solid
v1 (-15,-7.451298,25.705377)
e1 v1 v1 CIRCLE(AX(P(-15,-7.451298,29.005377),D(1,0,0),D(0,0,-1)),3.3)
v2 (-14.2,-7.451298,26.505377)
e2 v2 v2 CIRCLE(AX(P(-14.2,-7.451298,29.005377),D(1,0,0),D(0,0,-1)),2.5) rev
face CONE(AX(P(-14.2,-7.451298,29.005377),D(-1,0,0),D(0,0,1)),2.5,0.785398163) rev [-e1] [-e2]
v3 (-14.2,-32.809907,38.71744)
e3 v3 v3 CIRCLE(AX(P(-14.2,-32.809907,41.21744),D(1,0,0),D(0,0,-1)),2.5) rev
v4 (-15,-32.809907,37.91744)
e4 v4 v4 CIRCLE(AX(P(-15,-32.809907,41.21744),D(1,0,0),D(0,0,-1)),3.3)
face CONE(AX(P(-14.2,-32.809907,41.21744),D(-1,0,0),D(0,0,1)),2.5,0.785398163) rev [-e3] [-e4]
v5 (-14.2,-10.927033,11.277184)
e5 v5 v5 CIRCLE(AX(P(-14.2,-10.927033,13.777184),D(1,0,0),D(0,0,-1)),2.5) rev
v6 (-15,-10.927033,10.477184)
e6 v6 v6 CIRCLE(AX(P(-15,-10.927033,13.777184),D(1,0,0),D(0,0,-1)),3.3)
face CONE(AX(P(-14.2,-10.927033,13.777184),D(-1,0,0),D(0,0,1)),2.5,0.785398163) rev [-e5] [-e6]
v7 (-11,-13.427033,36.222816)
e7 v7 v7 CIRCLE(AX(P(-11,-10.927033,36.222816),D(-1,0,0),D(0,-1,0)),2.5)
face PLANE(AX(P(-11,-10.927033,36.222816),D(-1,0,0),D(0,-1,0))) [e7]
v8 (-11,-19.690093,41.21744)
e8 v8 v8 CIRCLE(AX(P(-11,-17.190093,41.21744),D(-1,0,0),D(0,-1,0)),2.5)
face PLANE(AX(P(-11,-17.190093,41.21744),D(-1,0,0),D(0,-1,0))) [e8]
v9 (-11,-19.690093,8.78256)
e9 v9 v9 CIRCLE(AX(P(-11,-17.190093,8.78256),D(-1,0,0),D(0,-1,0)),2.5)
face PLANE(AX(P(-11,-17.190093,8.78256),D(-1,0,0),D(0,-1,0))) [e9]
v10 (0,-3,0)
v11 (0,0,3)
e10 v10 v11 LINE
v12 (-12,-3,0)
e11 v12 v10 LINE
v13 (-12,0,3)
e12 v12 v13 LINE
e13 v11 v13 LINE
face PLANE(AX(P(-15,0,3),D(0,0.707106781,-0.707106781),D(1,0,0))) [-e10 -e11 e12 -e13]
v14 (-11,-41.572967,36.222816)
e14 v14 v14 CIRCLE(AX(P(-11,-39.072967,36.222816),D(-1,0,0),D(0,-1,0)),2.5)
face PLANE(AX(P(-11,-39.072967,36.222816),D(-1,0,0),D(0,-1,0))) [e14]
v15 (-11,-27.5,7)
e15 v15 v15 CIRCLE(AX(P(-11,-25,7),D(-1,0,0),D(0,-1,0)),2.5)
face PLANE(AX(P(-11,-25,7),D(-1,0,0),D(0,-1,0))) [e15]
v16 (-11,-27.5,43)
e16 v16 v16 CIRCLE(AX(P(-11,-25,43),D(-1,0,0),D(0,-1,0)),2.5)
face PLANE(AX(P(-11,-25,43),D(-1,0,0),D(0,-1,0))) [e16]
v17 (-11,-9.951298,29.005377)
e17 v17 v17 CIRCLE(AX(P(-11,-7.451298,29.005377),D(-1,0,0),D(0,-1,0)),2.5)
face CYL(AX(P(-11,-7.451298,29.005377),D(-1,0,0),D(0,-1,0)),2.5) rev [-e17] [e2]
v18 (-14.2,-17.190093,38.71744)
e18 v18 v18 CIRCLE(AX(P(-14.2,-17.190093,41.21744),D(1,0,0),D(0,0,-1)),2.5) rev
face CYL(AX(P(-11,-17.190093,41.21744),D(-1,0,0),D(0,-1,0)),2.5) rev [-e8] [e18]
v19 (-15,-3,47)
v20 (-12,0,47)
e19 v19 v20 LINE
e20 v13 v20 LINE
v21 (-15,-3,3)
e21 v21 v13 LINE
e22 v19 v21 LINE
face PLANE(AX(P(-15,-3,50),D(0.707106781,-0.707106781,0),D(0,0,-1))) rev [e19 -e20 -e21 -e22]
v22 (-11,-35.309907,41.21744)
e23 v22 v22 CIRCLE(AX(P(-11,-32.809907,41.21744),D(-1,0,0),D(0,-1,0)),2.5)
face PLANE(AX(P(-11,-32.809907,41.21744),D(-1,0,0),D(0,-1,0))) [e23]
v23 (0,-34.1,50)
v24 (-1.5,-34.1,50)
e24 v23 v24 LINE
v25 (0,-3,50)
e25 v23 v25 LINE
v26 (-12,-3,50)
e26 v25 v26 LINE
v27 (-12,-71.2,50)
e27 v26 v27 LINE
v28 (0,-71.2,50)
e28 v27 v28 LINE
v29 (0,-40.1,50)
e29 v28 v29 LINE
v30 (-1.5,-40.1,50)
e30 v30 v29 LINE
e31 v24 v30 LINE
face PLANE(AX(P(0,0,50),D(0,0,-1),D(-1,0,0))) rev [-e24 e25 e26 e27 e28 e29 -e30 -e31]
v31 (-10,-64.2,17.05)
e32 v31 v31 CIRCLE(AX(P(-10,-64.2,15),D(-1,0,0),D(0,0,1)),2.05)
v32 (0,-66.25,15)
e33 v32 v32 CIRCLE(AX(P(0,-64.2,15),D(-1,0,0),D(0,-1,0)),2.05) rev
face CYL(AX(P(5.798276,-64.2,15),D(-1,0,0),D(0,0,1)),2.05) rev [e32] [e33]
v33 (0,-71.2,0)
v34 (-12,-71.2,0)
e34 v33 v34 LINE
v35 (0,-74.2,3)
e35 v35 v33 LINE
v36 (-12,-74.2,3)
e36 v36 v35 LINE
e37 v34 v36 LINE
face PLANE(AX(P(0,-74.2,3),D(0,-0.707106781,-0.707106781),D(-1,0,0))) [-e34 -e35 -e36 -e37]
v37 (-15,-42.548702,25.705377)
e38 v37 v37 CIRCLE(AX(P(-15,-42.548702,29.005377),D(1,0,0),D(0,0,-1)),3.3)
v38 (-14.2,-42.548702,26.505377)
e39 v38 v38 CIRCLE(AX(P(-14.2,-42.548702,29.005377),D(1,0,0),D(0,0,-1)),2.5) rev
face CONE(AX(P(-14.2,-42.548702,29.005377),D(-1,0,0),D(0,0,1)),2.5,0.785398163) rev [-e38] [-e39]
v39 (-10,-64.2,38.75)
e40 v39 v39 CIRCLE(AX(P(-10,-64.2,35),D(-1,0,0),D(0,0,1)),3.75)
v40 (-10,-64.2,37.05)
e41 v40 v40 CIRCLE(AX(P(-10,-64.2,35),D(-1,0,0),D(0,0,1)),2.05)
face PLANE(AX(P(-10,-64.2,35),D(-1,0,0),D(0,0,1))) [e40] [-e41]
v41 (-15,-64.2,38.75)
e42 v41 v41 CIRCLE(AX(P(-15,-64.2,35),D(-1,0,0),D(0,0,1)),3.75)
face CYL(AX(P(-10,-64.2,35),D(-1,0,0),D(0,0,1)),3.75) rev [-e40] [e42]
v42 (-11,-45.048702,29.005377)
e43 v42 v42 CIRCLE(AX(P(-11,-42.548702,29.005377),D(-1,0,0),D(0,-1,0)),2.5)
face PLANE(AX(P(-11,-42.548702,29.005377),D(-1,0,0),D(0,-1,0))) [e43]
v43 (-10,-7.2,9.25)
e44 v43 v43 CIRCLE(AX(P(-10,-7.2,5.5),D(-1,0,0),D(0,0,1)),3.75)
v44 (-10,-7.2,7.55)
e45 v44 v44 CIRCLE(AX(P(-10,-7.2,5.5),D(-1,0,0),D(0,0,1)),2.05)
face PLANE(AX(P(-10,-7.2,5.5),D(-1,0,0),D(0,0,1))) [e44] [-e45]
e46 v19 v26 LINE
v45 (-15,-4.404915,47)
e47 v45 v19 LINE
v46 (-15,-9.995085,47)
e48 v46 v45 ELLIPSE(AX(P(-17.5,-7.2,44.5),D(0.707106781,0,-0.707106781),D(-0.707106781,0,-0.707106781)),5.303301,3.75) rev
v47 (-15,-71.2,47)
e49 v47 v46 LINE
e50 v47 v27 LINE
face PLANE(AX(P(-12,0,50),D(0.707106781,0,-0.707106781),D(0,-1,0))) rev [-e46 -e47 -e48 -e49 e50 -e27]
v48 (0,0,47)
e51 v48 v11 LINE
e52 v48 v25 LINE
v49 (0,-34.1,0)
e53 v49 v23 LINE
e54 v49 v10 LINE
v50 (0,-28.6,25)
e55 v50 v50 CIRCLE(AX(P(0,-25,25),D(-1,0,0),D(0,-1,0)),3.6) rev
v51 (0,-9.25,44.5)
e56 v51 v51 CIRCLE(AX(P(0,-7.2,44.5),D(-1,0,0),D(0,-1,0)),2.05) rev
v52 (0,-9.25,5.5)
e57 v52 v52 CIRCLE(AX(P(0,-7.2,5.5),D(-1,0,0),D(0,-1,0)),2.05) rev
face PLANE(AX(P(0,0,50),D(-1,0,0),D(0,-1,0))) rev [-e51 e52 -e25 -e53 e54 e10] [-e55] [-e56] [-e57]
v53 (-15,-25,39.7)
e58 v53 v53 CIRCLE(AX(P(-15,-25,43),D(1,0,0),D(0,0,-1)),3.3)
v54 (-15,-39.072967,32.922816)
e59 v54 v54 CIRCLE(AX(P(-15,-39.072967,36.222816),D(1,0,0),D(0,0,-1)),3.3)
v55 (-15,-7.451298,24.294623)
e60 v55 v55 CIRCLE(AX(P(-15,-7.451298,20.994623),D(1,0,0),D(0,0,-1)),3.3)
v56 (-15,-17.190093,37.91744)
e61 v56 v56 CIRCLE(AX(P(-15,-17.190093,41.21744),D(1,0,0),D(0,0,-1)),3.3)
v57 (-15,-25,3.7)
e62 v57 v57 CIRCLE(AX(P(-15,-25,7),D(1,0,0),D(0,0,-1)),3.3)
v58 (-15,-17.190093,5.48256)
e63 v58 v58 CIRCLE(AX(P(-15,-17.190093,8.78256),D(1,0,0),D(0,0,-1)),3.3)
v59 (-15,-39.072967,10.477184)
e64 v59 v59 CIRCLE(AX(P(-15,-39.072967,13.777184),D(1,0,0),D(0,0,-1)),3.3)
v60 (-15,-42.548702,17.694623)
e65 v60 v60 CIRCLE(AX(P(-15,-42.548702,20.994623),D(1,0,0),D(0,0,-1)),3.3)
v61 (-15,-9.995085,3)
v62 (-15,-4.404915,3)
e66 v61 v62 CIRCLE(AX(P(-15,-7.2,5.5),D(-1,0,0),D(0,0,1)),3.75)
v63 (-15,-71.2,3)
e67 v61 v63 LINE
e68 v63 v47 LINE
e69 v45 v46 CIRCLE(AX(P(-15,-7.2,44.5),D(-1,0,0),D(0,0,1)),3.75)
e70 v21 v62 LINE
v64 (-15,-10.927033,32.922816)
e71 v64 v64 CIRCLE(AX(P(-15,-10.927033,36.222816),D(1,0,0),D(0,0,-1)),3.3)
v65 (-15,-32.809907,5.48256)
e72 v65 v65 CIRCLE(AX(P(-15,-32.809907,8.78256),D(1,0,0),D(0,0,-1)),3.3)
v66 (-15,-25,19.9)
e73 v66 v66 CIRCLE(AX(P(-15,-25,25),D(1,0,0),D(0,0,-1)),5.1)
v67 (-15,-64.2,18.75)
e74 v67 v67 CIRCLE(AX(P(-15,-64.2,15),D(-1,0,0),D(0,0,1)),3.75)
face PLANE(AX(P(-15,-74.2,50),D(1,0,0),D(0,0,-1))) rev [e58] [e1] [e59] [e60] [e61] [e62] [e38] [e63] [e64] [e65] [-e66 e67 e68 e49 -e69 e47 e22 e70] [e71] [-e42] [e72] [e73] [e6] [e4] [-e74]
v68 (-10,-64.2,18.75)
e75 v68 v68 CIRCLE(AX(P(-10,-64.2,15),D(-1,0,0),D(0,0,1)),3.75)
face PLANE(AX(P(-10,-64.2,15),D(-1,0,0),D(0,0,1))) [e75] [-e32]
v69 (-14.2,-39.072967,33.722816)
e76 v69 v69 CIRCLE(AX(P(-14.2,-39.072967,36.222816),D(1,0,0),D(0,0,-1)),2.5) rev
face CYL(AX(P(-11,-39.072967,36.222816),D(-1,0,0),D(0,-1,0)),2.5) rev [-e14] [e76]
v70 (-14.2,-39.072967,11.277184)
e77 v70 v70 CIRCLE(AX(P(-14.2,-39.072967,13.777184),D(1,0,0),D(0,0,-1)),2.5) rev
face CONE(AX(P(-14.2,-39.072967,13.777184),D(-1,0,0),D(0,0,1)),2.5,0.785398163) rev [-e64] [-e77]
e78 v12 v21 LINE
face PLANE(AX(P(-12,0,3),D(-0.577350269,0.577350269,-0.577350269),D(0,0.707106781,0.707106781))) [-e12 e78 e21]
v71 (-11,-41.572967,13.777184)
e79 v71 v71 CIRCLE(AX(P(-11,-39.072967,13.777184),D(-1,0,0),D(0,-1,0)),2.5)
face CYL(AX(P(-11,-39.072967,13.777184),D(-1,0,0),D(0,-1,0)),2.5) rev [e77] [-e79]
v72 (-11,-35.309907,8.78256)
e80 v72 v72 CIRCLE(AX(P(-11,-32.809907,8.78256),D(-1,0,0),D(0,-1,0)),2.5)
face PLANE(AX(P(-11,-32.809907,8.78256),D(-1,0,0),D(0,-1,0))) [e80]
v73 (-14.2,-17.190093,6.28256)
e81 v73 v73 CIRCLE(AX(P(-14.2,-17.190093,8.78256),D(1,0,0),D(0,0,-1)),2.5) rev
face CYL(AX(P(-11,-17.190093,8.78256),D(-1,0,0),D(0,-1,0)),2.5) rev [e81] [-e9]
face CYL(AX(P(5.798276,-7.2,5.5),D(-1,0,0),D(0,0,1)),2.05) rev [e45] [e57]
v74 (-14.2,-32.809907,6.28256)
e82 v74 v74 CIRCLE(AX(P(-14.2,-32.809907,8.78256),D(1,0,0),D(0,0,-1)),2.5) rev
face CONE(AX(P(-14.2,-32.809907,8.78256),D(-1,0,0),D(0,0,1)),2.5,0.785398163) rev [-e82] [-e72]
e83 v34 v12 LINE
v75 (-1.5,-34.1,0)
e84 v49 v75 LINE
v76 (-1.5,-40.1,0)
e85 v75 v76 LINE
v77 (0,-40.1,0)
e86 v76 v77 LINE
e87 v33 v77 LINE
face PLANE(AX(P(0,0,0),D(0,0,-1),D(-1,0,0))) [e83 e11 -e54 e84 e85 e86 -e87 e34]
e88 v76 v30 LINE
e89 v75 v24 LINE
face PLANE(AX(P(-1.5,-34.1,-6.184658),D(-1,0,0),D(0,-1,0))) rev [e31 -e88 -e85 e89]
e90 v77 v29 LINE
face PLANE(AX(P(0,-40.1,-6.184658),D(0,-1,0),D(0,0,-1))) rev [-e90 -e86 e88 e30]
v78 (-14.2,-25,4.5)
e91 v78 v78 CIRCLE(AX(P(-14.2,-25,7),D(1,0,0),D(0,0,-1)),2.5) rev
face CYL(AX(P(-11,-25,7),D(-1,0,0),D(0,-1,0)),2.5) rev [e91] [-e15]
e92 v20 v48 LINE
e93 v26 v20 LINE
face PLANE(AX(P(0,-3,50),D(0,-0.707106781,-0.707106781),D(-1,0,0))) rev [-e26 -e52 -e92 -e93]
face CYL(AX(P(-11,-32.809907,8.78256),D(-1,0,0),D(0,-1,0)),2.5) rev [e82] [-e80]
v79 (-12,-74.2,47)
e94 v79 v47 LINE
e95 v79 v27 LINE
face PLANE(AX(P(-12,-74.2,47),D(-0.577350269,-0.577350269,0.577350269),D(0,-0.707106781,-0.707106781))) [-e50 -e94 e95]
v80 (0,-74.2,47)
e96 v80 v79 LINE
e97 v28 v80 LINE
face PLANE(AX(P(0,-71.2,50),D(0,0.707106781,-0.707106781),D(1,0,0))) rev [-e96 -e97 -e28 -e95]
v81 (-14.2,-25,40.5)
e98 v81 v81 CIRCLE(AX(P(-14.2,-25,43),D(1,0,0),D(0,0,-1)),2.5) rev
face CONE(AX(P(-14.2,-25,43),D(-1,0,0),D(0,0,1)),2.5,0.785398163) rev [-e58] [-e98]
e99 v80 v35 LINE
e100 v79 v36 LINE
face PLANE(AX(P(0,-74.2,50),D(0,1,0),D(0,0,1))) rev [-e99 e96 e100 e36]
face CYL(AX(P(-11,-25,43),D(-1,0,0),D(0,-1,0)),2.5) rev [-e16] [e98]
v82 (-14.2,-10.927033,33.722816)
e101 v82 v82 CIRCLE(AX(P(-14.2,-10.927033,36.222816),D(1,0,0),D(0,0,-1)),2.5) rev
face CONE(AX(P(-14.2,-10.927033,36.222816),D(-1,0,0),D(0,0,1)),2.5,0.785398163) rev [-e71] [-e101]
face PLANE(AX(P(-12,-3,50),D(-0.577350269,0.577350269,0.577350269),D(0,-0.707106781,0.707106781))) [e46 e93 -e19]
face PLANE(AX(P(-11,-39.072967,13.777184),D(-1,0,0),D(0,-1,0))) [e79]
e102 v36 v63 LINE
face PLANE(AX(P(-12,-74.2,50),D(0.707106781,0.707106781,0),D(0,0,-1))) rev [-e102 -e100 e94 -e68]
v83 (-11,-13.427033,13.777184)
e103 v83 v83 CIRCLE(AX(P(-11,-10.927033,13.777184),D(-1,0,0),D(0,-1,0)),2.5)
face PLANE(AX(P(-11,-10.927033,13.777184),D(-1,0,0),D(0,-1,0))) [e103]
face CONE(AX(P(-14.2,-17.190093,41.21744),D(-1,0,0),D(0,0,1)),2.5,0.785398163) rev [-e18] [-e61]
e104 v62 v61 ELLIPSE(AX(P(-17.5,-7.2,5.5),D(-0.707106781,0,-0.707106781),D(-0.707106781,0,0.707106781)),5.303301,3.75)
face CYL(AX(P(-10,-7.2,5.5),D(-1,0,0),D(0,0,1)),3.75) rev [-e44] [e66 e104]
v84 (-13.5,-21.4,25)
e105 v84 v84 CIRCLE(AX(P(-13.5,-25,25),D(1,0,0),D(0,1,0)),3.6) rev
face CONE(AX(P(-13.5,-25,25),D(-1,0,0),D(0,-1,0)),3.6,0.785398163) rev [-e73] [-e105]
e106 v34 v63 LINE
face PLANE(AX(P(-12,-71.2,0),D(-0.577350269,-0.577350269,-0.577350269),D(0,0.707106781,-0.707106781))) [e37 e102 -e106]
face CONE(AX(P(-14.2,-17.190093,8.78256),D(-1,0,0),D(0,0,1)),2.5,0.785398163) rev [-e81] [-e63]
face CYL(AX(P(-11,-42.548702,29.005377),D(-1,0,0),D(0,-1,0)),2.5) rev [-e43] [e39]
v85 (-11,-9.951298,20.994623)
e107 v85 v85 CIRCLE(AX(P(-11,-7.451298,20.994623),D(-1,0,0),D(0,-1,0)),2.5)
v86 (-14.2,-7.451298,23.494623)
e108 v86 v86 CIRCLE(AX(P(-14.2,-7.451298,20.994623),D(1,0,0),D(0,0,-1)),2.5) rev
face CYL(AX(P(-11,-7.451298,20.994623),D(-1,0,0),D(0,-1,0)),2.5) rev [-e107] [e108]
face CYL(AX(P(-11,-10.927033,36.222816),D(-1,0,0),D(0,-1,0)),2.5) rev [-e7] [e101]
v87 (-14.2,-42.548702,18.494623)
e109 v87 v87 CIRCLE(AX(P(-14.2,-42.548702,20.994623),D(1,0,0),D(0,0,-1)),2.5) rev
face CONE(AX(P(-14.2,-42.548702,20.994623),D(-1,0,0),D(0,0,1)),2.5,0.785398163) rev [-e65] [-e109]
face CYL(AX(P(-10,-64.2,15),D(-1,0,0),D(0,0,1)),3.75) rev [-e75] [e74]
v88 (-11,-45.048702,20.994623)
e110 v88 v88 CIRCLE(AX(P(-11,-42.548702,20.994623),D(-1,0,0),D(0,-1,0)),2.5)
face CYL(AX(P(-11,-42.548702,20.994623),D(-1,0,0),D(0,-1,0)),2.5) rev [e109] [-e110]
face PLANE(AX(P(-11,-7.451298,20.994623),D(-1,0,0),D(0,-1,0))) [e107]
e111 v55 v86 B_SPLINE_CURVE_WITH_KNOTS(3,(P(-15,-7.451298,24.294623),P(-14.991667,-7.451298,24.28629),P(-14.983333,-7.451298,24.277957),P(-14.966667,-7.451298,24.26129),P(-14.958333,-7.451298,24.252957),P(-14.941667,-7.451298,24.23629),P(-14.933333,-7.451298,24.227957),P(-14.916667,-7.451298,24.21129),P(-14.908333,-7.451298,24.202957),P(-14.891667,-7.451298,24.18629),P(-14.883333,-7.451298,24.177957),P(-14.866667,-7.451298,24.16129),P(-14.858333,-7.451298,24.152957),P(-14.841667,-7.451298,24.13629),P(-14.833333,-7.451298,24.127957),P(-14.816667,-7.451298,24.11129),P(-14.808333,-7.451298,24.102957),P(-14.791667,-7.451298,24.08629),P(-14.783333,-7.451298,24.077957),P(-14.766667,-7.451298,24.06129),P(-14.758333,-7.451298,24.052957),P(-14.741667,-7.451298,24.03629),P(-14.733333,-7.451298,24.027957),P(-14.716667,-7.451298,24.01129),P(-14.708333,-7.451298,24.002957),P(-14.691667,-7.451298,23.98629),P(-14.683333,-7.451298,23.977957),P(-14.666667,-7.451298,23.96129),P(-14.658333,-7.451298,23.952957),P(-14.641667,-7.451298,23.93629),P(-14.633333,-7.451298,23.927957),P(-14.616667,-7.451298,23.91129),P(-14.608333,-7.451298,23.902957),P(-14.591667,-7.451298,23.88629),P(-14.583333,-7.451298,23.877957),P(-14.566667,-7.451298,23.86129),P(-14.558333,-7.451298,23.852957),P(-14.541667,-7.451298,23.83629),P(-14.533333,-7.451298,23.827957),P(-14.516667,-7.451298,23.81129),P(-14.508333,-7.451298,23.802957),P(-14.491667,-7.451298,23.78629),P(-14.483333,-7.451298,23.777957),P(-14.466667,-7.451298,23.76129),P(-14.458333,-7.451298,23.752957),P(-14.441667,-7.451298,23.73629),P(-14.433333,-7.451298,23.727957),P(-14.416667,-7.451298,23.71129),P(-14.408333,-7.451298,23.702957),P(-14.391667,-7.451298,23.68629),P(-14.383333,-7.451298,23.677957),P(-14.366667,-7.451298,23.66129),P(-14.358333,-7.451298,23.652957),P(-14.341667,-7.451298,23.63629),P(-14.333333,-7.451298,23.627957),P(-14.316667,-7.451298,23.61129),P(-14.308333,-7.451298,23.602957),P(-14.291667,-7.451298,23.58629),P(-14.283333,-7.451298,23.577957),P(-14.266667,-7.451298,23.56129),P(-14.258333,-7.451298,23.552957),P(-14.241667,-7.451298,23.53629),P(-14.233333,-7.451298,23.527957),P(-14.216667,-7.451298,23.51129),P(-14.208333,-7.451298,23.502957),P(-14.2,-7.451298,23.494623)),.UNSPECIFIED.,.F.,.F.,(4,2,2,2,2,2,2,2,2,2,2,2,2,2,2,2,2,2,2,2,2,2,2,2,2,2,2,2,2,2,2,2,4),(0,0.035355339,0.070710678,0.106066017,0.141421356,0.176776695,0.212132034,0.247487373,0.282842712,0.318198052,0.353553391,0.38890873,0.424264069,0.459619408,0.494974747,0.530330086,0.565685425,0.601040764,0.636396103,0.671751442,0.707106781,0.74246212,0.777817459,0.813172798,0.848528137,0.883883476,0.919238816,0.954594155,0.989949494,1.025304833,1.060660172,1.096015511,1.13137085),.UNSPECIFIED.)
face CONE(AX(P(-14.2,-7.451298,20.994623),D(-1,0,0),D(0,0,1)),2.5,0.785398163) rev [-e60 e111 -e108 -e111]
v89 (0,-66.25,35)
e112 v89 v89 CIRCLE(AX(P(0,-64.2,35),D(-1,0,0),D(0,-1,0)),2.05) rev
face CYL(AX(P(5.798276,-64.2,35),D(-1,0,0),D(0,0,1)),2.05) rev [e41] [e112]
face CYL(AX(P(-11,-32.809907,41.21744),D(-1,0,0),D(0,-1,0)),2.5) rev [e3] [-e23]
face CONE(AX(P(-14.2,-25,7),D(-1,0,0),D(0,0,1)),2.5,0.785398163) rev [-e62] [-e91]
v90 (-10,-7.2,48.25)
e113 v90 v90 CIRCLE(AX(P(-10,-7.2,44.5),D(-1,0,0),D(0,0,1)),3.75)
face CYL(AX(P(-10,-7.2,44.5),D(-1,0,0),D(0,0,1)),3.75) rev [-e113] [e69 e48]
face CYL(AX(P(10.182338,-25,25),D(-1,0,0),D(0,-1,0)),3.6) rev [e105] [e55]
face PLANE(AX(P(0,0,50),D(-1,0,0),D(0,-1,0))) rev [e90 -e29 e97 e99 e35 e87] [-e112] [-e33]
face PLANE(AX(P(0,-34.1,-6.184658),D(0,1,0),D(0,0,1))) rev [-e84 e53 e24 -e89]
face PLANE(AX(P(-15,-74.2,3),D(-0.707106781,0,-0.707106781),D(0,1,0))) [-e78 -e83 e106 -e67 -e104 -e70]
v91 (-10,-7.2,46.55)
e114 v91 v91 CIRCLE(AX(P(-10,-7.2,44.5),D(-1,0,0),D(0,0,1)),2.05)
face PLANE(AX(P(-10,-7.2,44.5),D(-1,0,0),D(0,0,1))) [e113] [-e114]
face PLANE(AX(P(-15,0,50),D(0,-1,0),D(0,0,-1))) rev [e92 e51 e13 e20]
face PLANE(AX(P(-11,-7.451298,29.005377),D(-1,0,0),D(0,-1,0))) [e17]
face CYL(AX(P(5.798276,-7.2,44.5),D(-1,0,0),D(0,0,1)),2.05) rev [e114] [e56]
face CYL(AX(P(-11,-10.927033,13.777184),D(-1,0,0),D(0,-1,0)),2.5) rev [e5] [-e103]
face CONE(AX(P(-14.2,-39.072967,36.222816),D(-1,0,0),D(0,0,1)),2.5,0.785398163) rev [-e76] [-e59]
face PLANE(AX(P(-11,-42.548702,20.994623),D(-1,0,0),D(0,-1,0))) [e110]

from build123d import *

# Parameters (mm, degrees)
SKETCH1_W           = 15
SKETCH1_H           = 74.2
BOSS_EXTRUDE1_DEPTH = 50
SKETCH4_R           = 2.5
CUT_EXTRUDE4_DEPTH  = 4
CHAMFER2_SIZE       = 0.8
SKETCH5_R           = 3.6
CUT_EXTRUDE5_DEPTH  = 15
CHAMFER3_SIZE       = 1.5
SKETCH6_W           = 1.5
SKETCH6_H           = 6
CUT_EXTRUDE6_DEPTH  = 50
SKETCH7_R           = 3.75
CUT_EXTRUDE7_DEPTH  = 5
SKETCH8_R           = 2.05
CUT_EXTRUDE8_DEPTH  = 10


with BuildPart() as part:
    # Sketch1 → Boss-Extrude1 (new body)
    with BuildSketch(Plane.XY):
        with Locations((-7.5, -37.1)):
            Rectangle(SKETCH1_W, SKETCH1_H)
    extrude(amount=BOSS_EXTRUDE1_DEPTH)

    # Sketch4 → Cut-Extrude4 (cut)
    with BuildSketch(Plane.ZY.offset(15)):
        with Locations(Location((43, -25, 0), (0, 0, 270))):
            Circle(SKETCH4_R)
        with Locations(Location((41.217439622, -32.809907304, 0), (0, 0, 270))):
            Circle(SKETCH4_R)
        with Locations(Location((36.222816433, -39.072966684, 0), (0, 0, 270))):
            Circle(SKETCH4_R)
        with Locations(Location((29.005376811, -42.548702419, 0), (0, 0, 270))):
            Circle(SKETCH4_R)
        with Locations(Location((20.994623189, -42.548702419, 0), (0, 0, 270))):
            Circle(SKETCH4_R)
        with Locations(Location((13.777183567, -39.072966684, 0), (0, 0, 270))):
            Circle(SKETCH4_R)
        with Locations(Location((8.782560378, -32.809907304, 0), (0, 0, 270))):
            Circle(SKETCH4_R)
        with Locations(Location((7, -25, 0), (0, 0, 270))):
            Circle(SKETCH4_R)
        with Locations(Location((8.782560378, -17.190092696, 0), (0, 0, 270))):
            Circle(SKETCH4_R)
        with Locations(Location((13.777183567, -10.927033316, 0), (0, 0, 270))):
            Circle(SKETCH4_R)
        with Locations(Location((20.994623189, -7.451297581, 0), (0, 0, 270))):
            Circle(SKETCH4_R)
        with Locations(Location((29.005376811, -7.451297581, 0), (0, 0, 270))):
            Circle(SKETCH4_R)
        with Locations(Location((36.222816433, -10.927033316, 0), (0, 0, 270))):
            Circle(SKETCH4_R)
        with Locations(Location((41.217439622, -17.190092696, 0), (0, 0, 270))):
            Circle(SKETCH4_R)
    extrude(amount=-CUT_EXTRUDE4_DEPTH, mode=Mode.SUBTRACT)

    # Chamfer2
    chamfer2_edges = [part.edges().sort_by_distance(p)[0] for p in [
        (-15, -30.309907304, 41.217439622),
        (-15, -36.572966684, 36.222816433),
        (-15, -40.048702419, 29.005376811),
        (-15, -40.048702419, 20.994623189),
        (-15, -36.572966684, 13.777183567),
        (-15, -30.309907304, 8.782560378),
        (-15, -22.5, 7),
        (-15, -14.690092696, 8.782560378),
        (-15, -8.427033316, 13.777183567),
        (-15, -4.951297581, 20.994623189),
        (-15, -4.951297581, 29.005376811),
        (-15, -8.427033316, 36.222816433),
        (-15, -14.690092696, 41.217439622),
        (-15, -22.5, 43),
    ]]
    chamfer(chamfer2_edges, length=CHAMFER2_SIZE)

    # Sketch5 → Cut-Extrude5 (cut)
    with BuildSketch(Plane.ZY.offset(15)):
        with Locations(Location((25, -25, 0), (0, 0, 270))):
            Circle(SKETCH5_R)
    extrude(amount=-CUT_EXTRUDE5_DEPTH, mode=Mode.SUBTRACT)

    # Chamfer3
    chamfer3_edges = [part.edges().sort_by_distance(p)[0] for p in [
        (-15, -21.4, 25),
    ]]
    chamfer(chamfer3_edges, length=CHAMFER3_SIZE)

    # Sketch6 → Cut-Extrude6 (cut)
    with BuildSketch(Plane.XY.offset(50)):
        with Locations((-0.75, -37.1)):
            Rectangle(SKETCH6_W, SKETCH6_H)
    extrude(amount=-CUT_EXTRUDE6_DEPTH, mode=Mode.SUBTRACT)

    # Sketch7 → Cut-Extrude7 (cut)
    with BuildSketch(Plane.ZY.offset(15)):
        with Locations((15, -64.2)):
            Circle(SKETCH7_R)
        with Locations((35, -64.2)):
            Circle(SKETCH7_R)
        with Locations((5.5, -7.2)):
            Circle(SKETCH7_R)
        with Locations((44.5, -7.2)):
            Circle(SKETCH7_R)
    extrude(amount=-CUT_EXTRUDE7_DEPTH, mode=Mode.SUBTRACT)

    # Sketch8 → Cut-Extrude8 (cut)
    with BuildSketch(Plane.ZY.offset(10)):
        with Locations((35, -64.2)):
            Circle(SKETCH8_R)
        with Locations((15, -64.2)):
            Circle(SKETCH8_R)
        with Locations((5.5, -7.2)):
            Circle(SKETCH8_R)
        with Locations((44.5, -7.2)):
            Circle(SKETCH8_R)
    extrude(amount=-CUT_EXTRUDE8_DEPTH, mode=Mode.SUBTRACT)

    # Chamfer4
    # the kernel refuses this chamfer: 3 mm, written as the material it takes off along each edge
    with BuildSketch(Plane(origin=(-13, -72.2, 48), x_dir=(0.7071067811865476, -0.7071067811865476, 0), z_dir=(-0.5773502691896257, -0.5773502691896257, 0.5773502691896257)), Plane(origin=(-13, -2, 48), x_dir=(0.7071067811865476, 0, 0.7071067811865476), z_dir=(-0.5773502691896257, 0.5773502691896257, 0.5773502691896257))) as chamfer4_piece_1:
        Polygon((-2.121320344, -1.224744871), (2.121320344, -1.224744871), (0, 2.449489743), align=None)
    extrude(amount=3.810511777, mode=Mode.SUBTRACT)
    with BuildSketch(Plane(origin=(-13, -72.2, 2), x_dir=(0.7071067811865476, -0.7071067811865476, 0), z_dir=(-0.5773502691896257, -0.5773502691896257, -0.5773502691896257)), Plane(origin=(-13, -2, 2), x_dir=(0.7071067811865476, 0, -0.7071067811865476), z_dir=(-0.5773502691896257, 0.5773502691896257, -0.5773502691896257))) as chamfer4_piece_2:
        Polygon((-2.121320344, 1.224744871), (2.121320344, 1.224744871), (0, -2.449489743), align=None)
    extrude(amount=3.810511777, mode=Mode.SUBTRACT)
    with BuildSketch(Plane(origin=(7.715048964, -74.2, 50), x_dir=(0, -0.027495876610586768, -0.9996219169112968), z_dir=(-1, 0, 0)), Plane(origin=(-22.715048964, 0, 0), x_dir=(0, -0.9996219169112968, -0.027495876610586372), z_dir=(1, 0, 0))) as chamfer4_piece_3:
        with BuildLine():
            Line((3.086019586, 0), (-0.169641465, -3.081353381))
            Line((-0.169641465, -3.081353381), (-0.22961878, -3.079703628))
            ThreePointArc((-0.22961878, -3.079703628), (-0.102387681, -1.540193489), (-0.059977315, 0.001649753))
            Line((-0.059977315, 0.001649753), (0.001649753, 0.059977315))
            ThreePointArc((0.001649753, 0.059977315), (1.543492994, 0.017566949), (3.087669338, 0.059977315))
            Line((3.087669338, 0.059977315), (3.086019586, 0))
        make_face()
    extrude(amount=30.430097928, mode=Mode.SUBTRACT)
    with BuildSketch(Plane(origin=(-22.715048964, 0, 50), x_dir=(0, -0.9996219169112968, 0.027495876610586778), z_dir=(1, 0, 0)), Plane(origin=(7.715048964, -74.2, 0), x_dir=(0, -0.027495876610586778, 0.9996219169112968), z_dir=(-1, 0, 0))) as chamfer4_piece_4:
        with BuildLine():
            Line((3.086019586, 0), (-0.169641465, 3.081353381))
            Line((-0.169641465, 3.081353381), (-0.22961878, 3.079703628))
            ThreePointArc((-0.22961878, 3.079703628), (-0.102387681, 1.540193489), (-0.059977315, -0.001649753))
            Line((-0.059977315, -0.001649753), (0.001649753, -0.059977315))
            ThreePointArc((0.001649753, -0.059977315), (1.543492994, -0.017566949), (3.087669338, -0.059977315))
            Line((3.087669338, -0.059977315), (3.086019586, 0))
        make_face()
    extrude(amount=30.430097928, mode=Mode.SUBTRACT)
    with BuildSketch(Plane(origin=(-15, -81.915048964, 0), x_dir=(-0.027495876610586202, 0, 0.9996219169112968), z_dir=(0, 1, 0))) as chamfer4_piece_5:
        with BuildLine():
            Line((3.086019586, 0), (-0.169641465, 3.081353381))
            Line((-0.169641465, 3.081353381), (-0.22961878, 3.079703628))
            ThreePointArc((-0.22961878, 3.079703628), (-0.102387681, 1.540193489), (-0.059977315, -0.001649753))
            Line((-0.059977315, -0.001649753), (0.001649753, -0.059977315))
            ThreePointArc((0.001649753, -0.059977315), (1.543492994, -0.017566949), (3.087669338, -0.059977315))
            Line((3.087669338, -0.059977315), (3.086019586, 0))
        make_face()
    extrude(amount=89.630097928, mode=Mode.SUBTRACT)
    with BuildSketch(Plane(origin=(-15, -74.2, -7.715048964), x_dir=(-0.02749587661058619, 0.9996219169112968, 0), z_dir=(0, 0, 1))) as chamfer4_piece_6:
        with BuildLine():
            Line((3.086019586, 0), (-0.169641465, -3.081353381))
            Line((-0.169641465, -3.081353381), (-0.22961878, -3.079703628))
            ThreePointArc((-0.22961878, -3.079703628), (-0.102387681, -1.540193489), (-0.059977315, 0.001649753))
            Line((-0.059977315, 0.001649753), (0.001649753, 0.059977315))
            ThreePointArc((0.001649753, 0.059977315), (1.543492994, 0.017566949), (3.087669338, 0.059977315))
            Line((3.087669338, 0.059977315), (3.086019586, 0))
        make_face()
    extrude(amount=65.430097928, mode=Mode.SUBTRACT)
    with BuildSketch(Plane(origin=(-15, 0, -7.715048964), x_dir=(-0.027495876610586202, -0.9996219169112968, 0), z_dir=(0, 0, 1))) as chamfer4_piece_7:
        with BuildLine():
            Line((3.086019586, 0), (-0.169641465, 3.081353381))
            Line((-0.169641465, 3.081353381), (-0.22961878, 3.079703628))
            ThreePointArc((-0.22961878, 3.079703628), (-0.102387681, 1.540193489), (-0.059977315, -0.001649753))
            Line((-0.059977315, -0.001649753), (0.001649753, -0.059977315))
            ThreePointArc((0.001649753, -0.059977315), (1.543492994, -0.017566949), (3.087669338, -0.059977315))
            Line((3.087669338, -0.059977315), (3.086019586, 0))
        make_face()
    extrude(amount=65.430097928, mode=Mode.SUBTRACT)
    with BuildSketch(Plane(origin=(-15, -81.915048964, 50), x_dir=(-0.02749587661058619, 0, -0.9996219169112968), z_dir=(0, 1, 0))) as chamfer4_piece_8:
        with BuildLine():
            Line((3.086019586, 0), (-0.169641465, -3.081353381))
            Line((-0.169641465, -3.081353381), (-0.22961878, -3.079703628))
            ThreePointArc((-0.22961878, -3.079703628), (-0.102387681, -1.540193489), (-0.059977315, 0.001649753))
            Line((-0.059977315, 0.001649753), (0.001649753, 0.059977315))
            ThreePointArc((0.001649753, 0.059977315), (1.543492994, 0.017566949), (3.087669338, 0.059977315))
            Line((3.087669338, 0.059977315), (3.086019586, 0))
        make_face()
    extrude(amount=89.630097928, mode=Mode.SUBTRACT)


solid = part.part
